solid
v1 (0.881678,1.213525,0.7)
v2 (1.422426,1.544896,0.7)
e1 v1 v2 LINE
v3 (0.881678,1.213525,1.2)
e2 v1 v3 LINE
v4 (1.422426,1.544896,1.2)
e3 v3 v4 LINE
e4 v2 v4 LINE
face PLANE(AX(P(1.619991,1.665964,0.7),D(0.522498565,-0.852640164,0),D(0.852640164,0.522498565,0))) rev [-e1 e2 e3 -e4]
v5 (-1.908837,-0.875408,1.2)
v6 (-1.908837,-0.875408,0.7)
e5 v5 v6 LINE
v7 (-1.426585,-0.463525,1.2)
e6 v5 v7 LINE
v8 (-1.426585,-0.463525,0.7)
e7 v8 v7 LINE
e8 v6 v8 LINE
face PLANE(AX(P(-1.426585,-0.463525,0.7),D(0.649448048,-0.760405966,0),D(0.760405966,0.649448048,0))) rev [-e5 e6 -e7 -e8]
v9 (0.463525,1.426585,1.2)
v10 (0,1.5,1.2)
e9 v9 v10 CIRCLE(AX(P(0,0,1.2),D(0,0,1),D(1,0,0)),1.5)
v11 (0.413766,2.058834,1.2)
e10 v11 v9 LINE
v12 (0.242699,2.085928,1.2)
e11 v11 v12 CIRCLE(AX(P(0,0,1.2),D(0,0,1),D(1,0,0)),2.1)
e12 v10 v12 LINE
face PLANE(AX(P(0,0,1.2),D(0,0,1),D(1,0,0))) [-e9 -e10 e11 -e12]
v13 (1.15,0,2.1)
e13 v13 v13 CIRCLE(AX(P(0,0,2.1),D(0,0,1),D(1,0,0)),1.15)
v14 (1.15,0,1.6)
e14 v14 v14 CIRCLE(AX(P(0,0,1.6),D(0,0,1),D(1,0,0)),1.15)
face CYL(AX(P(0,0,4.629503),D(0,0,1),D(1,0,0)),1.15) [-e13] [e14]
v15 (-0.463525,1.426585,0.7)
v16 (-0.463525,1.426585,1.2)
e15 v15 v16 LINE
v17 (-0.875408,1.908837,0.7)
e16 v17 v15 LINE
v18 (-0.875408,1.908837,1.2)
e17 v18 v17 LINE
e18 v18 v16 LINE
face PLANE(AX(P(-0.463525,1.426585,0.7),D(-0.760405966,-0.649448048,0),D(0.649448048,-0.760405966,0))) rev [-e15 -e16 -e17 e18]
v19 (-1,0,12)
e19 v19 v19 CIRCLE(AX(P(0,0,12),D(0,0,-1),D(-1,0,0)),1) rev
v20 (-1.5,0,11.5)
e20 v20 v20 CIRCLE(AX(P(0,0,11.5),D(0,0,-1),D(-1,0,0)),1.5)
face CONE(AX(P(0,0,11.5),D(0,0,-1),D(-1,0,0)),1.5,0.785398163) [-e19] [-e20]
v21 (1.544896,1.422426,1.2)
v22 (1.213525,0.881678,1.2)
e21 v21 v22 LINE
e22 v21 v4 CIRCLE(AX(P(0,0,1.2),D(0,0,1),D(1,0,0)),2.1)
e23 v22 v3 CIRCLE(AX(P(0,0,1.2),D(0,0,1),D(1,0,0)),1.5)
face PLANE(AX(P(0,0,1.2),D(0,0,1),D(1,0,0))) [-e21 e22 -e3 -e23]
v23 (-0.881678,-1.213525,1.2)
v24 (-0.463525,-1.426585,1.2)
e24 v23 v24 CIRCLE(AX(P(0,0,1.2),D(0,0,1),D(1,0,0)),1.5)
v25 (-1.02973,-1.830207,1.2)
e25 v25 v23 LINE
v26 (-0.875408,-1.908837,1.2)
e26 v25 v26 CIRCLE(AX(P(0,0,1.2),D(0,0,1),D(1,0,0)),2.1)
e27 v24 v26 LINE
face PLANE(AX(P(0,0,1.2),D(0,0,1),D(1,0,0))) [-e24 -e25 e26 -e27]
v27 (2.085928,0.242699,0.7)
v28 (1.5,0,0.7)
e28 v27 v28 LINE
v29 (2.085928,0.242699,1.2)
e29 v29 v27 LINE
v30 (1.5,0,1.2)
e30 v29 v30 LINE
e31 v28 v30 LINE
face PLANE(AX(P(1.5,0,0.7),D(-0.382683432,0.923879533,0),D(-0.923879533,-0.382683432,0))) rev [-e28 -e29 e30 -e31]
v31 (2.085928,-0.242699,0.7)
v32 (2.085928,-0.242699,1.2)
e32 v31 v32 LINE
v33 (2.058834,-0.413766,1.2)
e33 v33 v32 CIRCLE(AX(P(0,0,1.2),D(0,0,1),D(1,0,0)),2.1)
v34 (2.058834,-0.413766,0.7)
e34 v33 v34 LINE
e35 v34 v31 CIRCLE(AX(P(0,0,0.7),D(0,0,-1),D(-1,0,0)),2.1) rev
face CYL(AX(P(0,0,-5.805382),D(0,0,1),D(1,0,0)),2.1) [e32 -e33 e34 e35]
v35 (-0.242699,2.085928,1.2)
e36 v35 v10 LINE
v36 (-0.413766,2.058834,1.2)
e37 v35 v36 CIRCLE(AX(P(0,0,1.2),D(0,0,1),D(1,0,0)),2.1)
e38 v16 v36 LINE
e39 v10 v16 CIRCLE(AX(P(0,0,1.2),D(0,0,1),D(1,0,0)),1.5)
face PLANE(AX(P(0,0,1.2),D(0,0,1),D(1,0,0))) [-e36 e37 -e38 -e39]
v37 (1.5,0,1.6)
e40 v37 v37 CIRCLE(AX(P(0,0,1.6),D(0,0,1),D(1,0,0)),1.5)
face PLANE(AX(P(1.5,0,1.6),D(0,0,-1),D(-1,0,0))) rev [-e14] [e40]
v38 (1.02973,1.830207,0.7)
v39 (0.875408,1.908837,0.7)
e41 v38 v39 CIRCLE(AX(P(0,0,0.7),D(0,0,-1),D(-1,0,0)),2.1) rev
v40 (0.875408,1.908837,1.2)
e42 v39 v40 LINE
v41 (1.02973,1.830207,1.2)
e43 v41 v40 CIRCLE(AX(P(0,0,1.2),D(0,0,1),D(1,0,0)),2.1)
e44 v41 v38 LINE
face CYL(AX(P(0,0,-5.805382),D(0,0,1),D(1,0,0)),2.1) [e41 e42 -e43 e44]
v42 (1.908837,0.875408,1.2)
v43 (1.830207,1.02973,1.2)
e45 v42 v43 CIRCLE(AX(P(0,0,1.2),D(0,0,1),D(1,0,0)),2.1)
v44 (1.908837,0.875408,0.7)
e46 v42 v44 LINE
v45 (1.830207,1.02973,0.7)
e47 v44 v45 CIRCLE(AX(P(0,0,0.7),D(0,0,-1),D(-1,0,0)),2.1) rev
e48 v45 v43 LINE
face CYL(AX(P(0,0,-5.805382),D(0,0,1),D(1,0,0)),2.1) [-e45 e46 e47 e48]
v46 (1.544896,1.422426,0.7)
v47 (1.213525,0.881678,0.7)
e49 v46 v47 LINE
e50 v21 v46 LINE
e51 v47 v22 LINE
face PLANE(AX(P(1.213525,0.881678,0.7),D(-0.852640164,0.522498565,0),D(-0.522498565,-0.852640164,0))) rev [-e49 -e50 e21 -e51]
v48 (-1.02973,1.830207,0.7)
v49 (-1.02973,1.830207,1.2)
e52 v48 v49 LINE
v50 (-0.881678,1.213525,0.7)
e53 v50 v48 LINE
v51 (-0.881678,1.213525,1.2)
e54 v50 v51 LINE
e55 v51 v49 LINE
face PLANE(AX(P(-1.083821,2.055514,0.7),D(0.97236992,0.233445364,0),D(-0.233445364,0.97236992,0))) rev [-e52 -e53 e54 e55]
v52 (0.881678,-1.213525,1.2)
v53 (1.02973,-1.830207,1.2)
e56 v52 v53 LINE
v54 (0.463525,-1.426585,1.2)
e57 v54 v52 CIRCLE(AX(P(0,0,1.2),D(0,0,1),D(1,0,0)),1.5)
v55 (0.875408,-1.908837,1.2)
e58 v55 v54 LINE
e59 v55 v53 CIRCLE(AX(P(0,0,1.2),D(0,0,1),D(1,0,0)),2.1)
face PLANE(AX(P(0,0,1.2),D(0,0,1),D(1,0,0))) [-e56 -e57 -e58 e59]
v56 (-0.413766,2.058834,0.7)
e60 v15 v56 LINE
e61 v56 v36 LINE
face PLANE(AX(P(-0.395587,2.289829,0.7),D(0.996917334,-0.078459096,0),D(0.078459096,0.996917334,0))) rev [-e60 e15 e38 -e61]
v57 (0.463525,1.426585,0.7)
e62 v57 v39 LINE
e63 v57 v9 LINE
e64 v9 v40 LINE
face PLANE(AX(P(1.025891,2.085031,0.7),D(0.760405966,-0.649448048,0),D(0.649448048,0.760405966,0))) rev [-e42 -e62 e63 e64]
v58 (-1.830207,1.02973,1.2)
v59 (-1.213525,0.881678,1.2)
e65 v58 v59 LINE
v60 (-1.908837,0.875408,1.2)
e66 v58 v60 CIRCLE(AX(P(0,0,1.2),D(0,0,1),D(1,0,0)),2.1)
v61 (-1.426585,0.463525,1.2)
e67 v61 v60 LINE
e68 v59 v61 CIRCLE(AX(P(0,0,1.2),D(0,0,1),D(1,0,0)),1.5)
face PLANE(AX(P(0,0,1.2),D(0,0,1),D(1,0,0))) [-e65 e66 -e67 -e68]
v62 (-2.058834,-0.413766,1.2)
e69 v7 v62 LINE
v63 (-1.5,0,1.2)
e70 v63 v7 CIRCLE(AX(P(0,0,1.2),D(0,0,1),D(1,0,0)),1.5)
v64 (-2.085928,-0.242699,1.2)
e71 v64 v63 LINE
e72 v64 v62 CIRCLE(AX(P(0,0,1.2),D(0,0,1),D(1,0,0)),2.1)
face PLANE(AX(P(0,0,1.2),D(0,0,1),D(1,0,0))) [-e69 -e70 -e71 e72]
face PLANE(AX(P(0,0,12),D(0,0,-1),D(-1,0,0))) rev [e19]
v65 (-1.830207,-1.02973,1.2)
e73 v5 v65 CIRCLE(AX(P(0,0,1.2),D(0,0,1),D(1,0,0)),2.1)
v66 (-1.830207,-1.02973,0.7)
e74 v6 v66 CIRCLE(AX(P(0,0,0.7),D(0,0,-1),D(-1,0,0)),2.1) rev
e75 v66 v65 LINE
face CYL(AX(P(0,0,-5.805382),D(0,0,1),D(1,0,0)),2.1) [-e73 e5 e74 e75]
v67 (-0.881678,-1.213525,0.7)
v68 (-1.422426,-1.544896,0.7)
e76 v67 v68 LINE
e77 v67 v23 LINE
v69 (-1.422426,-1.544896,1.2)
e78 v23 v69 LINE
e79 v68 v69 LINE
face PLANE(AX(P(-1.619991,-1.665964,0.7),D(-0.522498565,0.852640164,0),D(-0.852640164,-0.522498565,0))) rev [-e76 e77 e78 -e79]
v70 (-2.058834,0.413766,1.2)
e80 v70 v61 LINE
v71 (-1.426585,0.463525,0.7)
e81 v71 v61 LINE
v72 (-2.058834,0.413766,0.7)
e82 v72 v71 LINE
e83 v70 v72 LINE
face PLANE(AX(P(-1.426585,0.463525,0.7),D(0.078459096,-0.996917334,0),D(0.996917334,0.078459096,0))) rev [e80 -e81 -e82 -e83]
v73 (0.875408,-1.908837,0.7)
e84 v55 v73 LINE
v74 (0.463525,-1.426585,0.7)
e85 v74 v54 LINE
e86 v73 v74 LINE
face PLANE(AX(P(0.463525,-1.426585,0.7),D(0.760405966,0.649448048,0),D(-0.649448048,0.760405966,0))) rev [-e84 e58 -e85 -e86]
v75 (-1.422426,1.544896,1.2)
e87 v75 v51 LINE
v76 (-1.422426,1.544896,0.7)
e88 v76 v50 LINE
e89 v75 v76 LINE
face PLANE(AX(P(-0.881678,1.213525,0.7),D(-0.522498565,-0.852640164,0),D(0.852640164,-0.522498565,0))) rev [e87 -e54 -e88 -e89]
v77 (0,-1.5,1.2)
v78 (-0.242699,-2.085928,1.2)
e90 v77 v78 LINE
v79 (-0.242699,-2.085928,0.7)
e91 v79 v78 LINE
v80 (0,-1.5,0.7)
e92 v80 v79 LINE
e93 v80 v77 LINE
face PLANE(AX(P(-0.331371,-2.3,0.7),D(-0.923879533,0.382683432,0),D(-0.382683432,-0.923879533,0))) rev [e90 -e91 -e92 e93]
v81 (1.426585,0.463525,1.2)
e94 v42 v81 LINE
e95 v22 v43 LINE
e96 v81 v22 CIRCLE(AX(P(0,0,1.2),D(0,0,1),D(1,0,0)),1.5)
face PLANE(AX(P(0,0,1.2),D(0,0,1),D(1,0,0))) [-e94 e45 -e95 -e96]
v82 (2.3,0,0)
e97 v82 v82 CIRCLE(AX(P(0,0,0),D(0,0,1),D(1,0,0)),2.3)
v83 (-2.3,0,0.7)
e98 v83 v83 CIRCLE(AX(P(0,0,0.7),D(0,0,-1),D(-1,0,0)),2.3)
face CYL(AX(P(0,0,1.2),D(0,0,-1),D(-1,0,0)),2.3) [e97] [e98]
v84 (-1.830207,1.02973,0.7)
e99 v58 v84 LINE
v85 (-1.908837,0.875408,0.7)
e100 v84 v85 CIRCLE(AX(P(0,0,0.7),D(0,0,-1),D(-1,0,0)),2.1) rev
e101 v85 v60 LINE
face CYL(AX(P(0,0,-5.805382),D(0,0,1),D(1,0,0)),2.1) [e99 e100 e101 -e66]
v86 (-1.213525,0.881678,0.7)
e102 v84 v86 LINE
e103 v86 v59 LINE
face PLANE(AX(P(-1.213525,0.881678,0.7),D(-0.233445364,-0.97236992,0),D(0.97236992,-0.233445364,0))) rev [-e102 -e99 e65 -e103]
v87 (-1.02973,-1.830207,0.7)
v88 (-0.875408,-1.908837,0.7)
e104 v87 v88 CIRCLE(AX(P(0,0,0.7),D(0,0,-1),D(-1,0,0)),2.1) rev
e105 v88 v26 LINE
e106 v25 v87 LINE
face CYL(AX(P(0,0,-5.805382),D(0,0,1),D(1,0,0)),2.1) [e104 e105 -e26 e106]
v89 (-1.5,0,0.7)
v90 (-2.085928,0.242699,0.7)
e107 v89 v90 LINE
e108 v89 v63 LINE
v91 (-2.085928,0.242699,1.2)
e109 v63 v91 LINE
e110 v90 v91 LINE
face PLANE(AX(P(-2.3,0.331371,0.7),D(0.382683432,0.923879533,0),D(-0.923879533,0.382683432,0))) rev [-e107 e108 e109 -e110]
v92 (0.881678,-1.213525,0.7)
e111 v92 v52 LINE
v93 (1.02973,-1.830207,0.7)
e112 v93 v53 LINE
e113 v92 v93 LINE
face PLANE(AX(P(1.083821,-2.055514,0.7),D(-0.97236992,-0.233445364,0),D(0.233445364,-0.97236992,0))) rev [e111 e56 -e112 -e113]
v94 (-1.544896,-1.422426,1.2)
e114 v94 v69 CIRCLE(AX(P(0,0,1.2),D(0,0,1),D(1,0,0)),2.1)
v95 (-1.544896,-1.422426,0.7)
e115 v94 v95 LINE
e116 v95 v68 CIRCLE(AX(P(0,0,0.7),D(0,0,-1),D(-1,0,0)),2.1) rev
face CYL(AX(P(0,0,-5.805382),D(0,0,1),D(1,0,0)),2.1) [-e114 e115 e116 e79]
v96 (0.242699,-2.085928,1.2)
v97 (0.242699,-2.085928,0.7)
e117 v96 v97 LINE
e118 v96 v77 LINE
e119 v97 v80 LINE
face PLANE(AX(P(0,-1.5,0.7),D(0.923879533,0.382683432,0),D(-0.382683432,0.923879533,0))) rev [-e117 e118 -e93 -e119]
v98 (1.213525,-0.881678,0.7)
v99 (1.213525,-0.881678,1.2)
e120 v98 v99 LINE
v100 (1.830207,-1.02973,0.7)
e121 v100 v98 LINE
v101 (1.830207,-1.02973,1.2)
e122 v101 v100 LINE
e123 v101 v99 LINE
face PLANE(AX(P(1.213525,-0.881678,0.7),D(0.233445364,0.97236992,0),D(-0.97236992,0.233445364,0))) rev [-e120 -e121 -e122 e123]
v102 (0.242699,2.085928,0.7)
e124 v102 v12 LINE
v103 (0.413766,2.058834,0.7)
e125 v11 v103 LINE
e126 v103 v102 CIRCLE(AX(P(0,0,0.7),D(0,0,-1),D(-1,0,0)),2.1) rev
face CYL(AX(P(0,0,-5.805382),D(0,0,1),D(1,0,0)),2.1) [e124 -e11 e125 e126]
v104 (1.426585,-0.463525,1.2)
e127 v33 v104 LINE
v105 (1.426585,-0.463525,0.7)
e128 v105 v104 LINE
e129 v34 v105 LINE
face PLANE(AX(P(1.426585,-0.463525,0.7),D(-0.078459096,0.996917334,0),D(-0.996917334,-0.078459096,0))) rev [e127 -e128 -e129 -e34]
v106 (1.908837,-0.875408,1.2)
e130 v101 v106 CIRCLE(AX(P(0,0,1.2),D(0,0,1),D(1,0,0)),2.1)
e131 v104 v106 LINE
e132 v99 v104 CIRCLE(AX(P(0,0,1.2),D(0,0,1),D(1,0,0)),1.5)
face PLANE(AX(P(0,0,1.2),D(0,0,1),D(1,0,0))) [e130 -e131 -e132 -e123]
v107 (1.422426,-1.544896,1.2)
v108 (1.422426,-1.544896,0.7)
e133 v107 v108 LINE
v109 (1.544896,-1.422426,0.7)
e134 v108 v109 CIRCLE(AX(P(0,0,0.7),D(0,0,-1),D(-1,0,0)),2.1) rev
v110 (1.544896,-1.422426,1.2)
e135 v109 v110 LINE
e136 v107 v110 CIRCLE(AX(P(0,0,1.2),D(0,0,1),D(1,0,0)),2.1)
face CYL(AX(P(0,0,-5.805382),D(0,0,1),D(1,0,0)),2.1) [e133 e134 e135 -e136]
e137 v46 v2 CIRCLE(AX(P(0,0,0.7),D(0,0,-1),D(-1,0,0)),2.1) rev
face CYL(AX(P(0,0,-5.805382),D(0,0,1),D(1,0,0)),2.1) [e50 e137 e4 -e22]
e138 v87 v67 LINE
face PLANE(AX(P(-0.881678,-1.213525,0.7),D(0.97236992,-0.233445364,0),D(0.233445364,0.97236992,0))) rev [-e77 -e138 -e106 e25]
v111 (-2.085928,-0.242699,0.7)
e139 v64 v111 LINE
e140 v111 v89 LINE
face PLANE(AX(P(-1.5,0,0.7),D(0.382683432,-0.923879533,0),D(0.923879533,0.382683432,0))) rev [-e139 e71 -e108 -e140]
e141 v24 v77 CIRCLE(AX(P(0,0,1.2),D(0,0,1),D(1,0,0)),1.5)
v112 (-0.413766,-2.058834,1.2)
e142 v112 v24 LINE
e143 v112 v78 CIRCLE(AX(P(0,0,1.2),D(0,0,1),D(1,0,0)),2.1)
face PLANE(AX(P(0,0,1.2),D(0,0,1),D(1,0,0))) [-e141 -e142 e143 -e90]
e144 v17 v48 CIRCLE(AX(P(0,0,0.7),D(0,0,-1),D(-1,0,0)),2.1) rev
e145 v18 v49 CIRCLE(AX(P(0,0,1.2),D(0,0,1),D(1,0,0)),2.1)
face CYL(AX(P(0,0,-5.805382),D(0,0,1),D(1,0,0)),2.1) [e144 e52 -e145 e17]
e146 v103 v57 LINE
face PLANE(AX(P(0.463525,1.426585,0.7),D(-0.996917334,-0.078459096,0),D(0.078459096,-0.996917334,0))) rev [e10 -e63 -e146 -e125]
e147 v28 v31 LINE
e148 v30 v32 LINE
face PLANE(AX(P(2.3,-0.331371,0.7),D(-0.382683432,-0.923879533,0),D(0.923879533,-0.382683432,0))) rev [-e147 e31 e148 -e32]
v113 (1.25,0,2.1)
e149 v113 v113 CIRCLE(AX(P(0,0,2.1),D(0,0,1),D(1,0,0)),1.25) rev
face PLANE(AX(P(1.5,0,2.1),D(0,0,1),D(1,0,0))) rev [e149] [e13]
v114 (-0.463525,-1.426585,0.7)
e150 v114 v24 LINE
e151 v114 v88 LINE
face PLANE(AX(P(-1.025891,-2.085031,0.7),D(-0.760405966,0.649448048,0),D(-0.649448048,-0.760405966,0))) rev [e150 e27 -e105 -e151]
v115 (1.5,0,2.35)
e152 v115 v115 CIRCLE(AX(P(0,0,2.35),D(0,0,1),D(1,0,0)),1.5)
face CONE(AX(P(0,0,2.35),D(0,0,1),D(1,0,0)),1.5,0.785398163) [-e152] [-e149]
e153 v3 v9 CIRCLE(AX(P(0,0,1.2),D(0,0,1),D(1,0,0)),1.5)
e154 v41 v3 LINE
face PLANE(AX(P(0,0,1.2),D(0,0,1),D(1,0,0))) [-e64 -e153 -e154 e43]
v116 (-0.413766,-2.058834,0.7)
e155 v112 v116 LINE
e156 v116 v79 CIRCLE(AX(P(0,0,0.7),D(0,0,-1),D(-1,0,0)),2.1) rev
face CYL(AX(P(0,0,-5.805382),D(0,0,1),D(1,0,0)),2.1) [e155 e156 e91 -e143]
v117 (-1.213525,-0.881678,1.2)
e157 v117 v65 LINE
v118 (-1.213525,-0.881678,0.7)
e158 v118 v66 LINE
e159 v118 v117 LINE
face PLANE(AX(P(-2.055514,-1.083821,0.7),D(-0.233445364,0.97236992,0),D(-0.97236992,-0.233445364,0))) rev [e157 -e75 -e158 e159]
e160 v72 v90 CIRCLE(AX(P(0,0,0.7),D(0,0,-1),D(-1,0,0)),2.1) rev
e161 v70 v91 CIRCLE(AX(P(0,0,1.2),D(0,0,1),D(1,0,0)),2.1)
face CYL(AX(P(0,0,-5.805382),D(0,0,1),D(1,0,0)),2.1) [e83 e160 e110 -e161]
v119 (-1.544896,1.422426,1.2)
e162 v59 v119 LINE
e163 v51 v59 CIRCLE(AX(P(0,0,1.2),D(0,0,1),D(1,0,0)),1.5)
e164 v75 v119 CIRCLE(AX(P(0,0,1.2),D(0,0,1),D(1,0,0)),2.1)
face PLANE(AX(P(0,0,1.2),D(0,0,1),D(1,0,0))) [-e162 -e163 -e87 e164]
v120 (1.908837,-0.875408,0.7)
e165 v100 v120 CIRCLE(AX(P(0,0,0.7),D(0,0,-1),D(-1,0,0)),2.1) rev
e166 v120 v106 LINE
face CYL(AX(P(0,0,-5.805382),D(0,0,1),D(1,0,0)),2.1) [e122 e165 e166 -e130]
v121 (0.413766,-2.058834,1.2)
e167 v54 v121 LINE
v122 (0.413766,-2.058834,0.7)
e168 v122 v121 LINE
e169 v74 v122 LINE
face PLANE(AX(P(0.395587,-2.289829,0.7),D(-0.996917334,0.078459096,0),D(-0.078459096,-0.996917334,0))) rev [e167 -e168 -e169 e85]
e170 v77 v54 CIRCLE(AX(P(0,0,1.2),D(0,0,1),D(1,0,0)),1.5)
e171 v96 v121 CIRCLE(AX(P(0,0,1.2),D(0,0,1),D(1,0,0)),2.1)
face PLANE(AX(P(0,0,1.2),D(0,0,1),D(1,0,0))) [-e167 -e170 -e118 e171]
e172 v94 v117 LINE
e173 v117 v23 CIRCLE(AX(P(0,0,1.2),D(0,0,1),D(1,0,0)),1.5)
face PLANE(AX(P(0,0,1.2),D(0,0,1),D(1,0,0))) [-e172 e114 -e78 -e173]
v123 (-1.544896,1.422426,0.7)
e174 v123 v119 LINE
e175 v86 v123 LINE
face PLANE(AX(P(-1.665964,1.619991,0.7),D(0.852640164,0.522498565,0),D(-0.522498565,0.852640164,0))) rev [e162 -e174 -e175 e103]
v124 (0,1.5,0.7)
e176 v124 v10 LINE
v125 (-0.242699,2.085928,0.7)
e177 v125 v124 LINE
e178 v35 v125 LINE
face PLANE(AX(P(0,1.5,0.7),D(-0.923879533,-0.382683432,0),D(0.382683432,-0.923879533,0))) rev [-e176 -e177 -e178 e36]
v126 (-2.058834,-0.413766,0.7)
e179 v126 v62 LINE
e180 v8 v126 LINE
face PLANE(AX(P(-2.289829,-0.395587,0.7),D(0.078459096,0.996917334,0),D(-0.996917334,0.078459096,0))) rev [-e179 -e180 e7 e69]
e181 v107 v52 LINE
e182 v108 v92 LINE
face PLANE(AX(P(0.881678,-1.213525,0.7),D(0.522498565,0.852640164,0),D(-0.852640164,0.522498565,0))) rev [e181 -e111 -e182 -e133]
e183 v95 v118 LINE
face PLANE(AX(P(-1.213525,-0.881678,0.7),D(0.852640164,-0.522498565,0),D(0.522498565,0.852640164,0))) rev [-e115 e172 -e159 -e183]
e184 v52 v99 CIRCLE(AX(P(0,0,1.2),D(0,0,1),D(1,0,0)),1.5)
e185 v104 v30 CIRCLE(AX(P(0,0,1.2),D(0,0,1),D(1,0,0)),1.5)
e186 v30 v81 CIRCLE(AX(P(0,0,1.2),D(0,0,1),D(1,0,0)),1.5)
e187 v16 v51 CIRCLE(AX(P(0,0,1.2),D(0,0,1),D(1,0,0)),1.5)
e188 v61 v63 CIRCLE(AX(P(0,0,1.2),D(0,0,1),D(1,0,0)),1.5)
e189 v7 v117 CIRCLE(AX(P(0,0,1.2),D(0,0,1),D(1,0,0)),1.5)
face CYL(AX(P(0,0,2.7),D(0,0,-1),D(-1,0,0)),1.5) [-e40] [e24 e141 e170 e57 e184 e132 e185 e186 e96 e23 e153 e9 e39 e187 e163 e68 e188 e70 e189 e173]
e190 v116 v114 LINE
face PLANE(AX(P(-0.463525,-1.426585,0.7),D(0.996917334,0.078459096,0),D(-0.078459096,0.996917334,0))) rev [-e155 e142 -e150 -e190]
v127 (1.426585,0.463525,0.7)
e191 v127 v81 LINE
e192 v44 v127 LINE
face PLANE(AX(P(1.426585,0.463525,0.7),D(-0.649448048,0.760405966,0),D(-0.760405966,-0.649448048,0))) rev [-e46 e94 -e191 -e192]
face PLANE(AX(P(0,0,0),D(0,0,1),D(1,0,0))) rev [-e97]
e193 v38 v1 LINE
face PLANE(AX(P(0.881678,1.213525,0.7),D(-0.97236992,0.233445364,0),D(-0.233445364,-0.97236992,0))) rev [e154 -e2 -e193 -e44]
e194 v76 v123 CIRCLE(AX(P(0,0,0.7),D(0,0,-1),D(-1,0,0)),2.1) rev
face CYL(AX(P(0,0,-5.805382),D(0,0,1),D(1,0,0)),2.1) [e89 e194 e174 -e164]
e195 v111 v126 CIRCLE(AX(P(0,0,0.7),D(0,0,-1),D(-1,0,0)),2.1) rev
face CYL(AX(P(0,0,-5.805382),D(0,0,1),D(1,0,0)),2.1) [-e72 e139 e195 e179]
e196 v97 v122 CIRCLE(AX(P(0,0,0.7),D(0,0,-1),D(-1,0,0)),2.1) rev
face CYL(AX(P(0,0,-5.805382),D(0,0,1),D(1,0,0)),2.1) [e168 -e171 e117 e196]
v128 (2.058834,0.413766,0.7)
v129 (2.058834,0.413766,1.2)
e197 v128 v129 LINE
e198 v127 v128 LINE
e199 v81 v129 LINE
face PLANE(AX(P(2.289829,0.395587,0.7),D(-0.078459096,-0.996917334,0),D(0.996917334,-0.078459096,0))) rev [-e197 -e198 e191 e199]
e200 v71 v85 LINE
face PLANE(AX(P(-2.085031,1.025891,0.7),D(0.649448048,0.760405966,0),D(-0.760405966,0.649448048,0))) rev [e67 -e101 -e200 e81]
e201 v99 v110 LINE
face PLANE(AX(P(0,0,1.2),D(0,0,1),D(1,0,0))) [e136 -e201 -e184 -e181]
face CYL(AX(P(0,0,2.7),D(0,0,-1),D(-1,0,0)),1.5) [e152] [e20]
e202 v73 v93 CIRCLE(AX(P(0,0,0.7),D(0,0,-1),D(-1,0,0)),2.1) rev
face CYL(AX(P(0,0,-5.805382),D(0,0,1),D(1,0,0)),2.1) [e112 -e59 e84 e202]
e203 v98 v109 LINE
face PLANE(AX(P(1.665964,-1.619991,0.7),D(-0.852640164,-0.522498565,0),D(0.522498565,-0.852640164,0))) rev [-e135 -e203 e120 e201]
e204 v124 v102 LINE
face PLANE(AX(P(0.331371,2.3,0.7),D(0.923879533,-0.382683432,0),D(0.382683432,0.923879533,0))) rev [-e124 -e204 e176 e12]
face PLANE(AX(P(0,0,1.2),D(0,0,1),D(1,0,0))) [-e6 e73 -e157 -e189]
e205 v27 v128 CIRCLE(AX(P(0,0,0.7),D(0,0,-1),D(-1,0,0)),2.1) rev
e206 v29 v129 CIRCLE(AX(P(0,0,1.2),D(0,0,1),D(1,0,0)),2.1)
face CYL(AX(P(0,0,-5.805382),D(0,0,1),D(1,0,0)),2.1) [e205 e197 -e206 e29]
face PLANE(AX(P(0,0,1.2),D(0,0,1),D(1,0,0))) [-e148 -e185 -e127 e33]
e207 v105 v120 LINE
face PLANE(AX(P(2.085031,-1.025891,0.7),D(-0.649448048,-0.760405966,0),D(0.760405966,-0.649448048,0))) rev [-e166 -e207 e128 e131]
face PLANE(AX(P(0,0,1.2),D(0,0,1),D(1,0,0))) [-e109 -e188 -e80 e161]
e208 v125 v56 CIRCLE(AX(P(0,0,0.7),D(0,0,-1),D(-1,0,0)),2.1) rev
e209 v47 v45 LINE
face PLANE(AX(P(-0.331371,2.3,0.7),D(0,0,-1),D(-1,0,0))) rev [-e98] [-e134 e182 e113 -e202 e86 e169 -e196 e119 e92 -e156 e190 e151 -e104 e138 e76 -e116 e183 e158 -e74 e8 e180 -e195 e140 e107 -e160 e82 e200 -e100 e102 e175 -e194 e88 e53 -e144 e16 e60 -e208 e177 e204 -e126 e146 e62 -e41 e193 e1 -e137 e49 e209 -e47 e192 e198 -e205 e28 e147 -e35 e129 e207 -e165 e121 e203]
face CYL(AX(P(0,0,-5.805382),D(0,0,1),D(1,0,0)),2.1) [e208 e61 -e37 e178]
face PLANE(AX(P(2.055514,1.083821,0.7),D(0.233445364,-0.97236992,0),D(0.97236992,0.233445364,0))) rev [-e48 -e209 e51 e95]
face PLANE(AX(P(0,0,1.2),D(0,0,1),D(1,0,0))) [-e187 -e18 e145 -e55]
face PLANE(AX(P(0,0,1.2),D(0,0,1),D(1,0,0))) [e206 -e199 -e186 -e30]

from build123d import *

# Parameters (mm, degrees)
SKETCH_1_R               = 2.3
EXTRUDE_1_DEPTH          = 1.2
SKETCH_2_R               = 1.5
EXTRUDE_2_DEPTH          = 1.5
CUT_EXTRUDE_1_DEPTH      = 0.5
PATTERN_CIRCULAR_1_COUNT = 20
SKETCH_4_W               = 0.35
SKETCH_4_H               = 0.5
SKETCH_6_W               = 9.3
SKETCH_6_H               = 1.5
CHAMFER_2_SIZE           = 0.5
CUT_EXTRUDE_START        = -0.5
SKETCH_7_R               = 2.3
SKETCH_7_R_2             = 2.1
CUT_EXTRUDE_2_DEPTH      = 0.5


with BuildPart() as part:
    # Эскиз1 → Вытянуть1 (new body)
    with BuildSketch(Plane.XY):
        Circle(SKETCH_1_R)
    extrude(amount=EXTRUDE_1_DEPTH)

    # Эскиз2 → Вытянуть2 (add)
    with BuildSketch(Plane.XY.offset(1.2)):
        Circle(SKETCH_2_R)
    extrude(amount=EXTRUDE_2_DEPTH)

    # Эскиз3 → Вырез-Вытянуть1 (cut)
    with BuildSketch(Plane.XY.offset(1.2)):
        Polygon((-0.33137085, 2.3), (0.33137085, 2.3), (0, 1.5), align=None)
    cut_extrude_1 = extrude(amount=-CUT_EXTRUDE_1_DEPTH, mode=Mode.SUBTRACT)

    # Круговой массив1: Вырез-Вытянуть1 ×20 about axis
    pattern_circular_1_axis = Axis((0, 0, 0), (0, 0, 1))
    for i in range(1, PATTERN_CIRCULAR_1_COUNT):
        add(cut_extrude_1.rotate(pattern_circular_1_axis, i * 360 / PATTERN_CIRCULAR_1_COUNT), mode=Mode.SUBTRACT)

    # Эскиз4 → Вырез-Повернуть1 (revolve, cut)
    with BuildSketch(Plane(origin=(0, 0, 0), x_dir=(1, 0, 0), z_dir=(0, 1, 0))):
        with Locations((1.325, -1.85)):
            Rectangle(SKETCH_4_W, SKETCH_4_H)
    revolve(axis=Axis((0, 0, 10.642619983), (0, 0, -1)), mode=Mode.SUBTRACT)

    # Эскиз6 → Повернуть1 (revolve)
    with BuildSketch(Plane(origin=(0, 0, 0), x_dir=(0, 0, -1), z_dir=(1, 0, 0)), mode=Mode.PRIVATE) as revolve_1_sk:
        with Locations((-7.35, -0.75)):
            Rectangle(SKETCH_6_W, SKETCH_6_H)
    revolve(revolve_1_sk.sketch.rotate(Axis((0, 0, 2.7), (0, 0, 1)), 278.047567557), axis=Axis((0, 0, 2.7), (0, 0, 1)))

    # Фаска2
    # the kernel refuses this chamfer: 0.5 mm, written as the material it takes off along each edge
    with BuildSketch(Plane(origin=(0, 0, 12), x_dir=(-0.9901521845161062, -0.1399951838385265, 0), z_dir=(-0.1399951838385265, 0.9901521845161062, 0))) as chamfer_2_piece_1:
        Polygon((1.5, -CHAMFER_2_SIZE), (1.5 - CHAMFER_2_SIZE, 0), (1.5, 0), align=None)
    revolve(axis=Axis((0, 0, 12), (0, 0, 1)), mode=Mode.SUBTRACT)

    # Эскиз7 → Вырез-Вытянуть2 (cut)
    with BuildSketch(Plane.XY.offset(1.2).offset(CUT_EXTRUDE_START)):
        with Locations(Location((0, 0, 0), (0, 0, 180))):
            Circle(SKETCH_7_R)
        Circle(SKETCH_7_R_2, mode=Mode.SUBTRACT)
    extrude(amount=CUT_EXTRUDE_2_DEPTH, mode=Mode.SUBTRACT)

    # Фаска3
    # the kernel refuses this chamfer: 0.25 mm, written as the material it takes off along each edge
    with BuildSketch(Plane(origin=(0, 0, 2.1), x_dir=(1, 0, 0), z_dir=(0, 1, 0))) as chamfer_3_piece_1:
        with BuildLine():
            Line((1.242928932, 0.007071068), (1.507071068, -0.257071068))
            Line((1.507071068, -0.257071068), (1.512071068, -0.257071068))
            ThreePointArc((1.512071068, -0.257071068), (1.505, -0.128535534), (1.505, 0))
            Line((1.505, 0), (1.5, 0.005))
            ThreePointArc((1.5, 0.005), (1.371464466, 0.005), (1.242928932, 0.012071068))
            Line((1.242928932, 0.012071068), (1.242928932, 0.007071068))
        make_face()
    revolve(axis=Axis((0, 0, 2.1), (0, 0, -1)), mode=Mode.SUBTRACT)


solid = part.part
